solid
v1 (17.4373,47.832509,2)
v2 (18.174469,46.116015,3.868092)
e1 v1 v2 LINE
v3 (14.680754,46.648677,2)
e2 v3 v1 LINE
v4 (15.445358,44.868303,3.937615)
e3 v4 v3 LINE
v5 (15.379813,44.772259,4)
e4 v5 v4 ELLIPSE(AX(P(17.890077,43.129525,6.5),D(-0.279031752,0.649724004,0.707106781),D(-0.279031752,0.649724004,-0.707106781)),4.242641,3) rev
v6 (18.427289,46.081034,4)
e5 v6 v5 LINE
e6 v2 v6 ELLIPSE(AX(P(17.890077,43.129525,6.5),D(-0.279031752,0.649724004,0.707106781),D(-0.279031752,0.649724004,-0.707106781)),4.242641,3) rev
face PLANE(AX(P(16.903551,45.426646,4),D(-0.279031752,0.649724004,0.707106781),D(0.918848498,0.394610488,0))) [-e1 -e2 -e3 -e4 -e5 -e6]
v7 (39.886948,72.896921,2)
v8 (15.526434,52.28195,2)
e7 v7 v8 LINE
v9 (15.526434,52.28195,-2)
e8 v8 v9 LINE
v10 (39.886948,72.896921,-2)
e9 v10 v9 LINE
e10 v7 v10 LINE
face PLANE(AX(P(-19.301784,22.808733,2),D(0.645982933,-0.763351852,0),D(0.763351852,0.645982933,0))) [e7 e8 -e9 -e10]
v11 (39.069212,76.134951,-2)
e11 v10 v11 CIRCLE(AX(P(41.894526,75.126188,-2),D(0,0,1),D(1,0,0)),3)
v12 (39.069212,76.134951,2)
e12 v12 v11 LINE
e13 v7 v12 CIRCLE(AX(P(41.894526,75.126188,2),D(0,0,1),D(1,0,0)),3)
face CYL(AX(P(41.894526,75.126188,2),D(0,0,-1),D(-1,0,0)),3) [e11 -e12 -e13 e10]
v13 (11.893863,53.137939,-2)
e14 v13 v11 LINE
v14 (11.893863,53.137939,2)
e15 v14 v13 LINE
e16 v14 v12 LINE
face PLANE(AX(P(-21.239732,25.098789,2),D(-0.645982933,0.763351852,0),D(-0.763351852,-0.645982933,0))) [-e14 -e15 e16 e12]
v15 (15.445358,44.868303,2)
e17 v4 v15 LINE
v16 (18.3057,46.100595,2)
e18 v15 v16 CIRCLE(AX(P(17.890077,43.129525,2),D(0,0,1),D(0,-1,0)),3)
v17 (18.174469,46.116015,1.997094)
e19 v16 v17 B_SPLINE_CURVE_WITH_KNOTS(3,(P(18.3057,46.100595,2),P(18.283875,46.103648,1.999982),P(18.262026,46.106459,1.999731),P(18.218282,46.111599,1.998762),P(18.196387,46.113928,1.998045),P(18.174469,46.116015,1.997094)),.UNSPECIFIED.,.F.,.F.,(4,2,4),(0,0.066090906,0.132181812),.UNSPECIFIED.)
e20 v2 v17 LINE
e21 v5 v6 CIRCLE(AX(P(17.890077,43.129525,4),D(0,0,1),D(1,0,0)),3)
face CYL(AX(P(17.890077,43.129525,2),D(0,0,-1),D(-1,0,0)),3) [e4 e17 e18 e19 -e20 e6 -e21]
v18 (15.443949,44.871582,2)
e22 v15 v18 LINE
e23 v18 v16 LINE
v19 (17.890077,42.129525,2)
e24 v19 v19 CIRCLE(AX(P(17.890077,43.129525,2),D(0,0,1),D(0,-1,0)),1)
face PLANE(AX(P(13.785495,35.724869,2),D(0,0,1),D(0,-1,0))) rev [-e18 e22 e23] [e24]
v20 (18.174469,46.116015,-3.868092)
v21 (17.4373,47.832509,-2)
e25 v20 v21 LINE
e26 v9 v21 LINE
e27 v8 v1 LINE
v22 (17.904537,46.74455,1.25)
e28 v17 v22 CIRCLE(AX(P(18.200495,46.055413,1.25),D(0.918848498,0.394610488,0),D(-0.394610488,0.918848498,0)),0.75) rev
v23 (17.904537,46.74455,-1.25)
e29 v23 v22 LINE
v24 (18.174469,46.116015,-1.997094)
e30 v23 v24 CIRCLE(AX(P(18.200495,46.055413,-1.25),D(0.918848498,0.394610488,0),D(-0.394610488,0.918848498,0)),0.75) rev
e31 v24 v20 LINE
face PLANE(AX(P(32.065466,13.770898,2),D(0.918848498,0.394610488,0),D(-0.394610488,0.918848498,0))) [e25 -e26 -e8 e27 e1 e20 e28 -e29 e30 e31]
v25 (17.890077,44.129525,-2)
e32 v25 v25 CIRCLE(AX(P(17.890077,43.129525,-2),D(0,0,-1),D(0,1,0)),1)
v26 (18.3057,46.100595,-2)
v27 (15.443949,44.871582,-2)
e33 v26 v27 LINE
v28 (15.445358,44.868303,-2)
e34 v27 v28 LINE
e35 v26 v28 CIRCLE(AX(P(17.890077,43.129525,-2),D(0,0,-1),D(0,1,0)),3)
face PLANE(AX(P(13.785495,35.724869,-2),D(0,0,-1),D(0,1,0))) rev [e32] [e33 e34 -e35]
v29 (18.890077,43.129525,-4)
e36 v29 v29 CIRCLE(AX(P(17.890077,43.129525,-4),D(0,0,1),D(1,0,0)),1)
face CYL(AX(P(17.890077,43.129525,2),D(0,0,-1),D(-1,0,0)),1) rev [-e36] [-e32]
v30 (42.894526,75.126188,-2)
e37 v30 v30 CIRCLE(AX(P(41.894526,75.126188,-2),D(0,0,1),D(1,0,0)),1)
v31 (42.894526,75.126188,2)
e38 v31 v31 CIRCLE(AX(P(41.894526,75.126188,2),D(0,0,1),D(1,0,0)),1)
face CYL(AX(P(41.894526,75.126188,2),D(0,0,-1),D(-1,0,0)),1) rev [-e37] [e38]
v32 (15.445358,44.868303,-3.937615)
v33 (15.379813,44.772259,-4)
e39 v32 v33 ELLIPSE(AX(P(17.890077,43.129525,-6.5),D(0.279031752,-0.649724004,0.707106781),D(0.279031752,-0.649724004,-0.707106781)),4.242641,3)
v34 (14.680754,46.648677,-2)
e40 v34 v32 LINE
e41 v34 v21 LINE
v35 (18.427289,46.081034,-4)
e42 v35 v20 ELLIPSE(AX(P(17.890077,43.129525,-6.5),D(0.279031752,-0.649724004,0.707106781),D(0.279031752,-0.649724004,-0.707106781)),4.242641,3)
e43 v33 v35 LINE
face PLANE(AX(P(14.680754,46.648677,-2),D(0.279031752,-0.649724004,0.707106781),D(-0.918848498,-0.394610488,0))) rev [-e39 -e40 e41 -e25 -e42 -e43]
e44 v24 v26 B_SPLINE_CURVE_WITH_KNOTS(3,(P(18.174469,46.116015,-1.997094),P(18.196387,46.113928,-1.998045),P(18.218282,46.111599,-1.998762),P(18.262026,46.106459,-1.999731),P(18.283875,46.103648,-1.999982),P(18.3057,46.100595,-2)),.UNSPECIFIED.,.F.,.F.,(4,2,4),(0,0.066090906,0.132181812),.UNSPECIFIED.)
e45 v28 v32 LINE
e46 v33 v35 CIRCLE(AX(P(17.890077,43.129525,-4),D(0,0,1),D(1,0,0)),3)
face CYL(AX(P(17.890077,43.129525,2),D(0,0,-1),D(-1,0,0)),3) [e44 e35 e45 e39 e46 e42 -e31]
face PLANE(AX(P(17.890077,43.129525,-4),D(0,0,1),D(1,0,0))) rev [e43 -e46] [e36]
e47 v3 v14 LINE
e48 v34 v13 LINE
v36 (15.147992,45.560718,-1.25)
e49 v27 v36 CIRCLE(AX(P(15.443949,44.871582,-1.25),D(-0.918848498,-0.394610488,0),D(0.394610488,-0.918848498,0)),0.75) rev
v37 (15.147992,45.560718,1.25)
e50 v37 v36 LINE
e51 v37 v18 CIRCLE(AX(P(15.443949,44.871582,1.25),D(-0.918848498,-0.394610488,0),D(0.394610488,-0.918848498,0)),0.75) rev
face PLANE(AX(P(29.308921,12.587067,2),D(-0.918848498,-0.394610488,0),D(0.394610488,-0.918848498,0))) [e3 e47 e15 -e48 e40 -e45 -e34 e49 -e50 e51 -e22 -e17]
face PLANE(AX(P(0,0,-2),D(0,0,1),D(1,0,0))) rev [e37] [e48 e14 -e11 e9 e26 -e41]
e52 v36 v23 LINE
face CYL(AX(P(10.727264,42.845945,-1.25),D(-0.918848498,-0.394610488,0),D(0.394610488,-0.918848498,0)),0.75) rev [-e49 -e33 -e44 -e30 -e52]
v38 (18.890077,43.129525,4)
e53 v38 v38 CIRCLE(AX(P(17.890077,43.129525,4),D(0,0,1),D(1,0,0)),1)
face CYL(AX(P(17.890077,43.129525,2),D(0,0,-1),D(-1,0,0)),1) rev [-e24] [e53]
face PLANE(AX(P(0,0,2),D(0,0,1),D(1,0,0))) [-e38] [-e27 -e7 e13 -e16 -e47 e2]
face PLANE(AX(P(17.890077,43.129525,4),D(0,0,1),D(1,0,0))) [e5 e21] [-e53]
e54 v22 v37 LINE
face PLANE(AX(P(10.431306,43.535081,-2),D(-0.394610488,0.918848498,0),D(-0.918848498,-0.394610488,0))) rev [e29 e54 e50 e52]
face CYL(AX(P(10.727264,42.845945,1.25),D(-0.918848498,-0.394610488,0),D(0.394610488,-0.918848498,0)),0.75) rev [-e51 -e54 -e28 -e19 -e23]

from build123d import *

# Parameters (mm, degrees)
SKETCH7_R               = 2.9999999999999982
SKETCH7_R_2             = 1.0000000000000018
SKETCH7_R_3             = 3.0000000000000018
SKETCH7_R_4             = 0.9999999999999983
BOSS_EXTRUDE1_DEPTH     = 2
SKETCH9_R               = 0.9999999999999983
BOSS_EXTRUDE2_DEPTH     = 4
CUT_EXTRUDE3_DEPTH      = 68.5610601855979
CUT_EXTRUDE3_DEPTH_BACK = 68.5610601855979
CHAMFER1_SIZE           = 2
FILLET10_R              = 0.75


with BuildPart() as part:
    # Sketch7 → Boss-Extrude1 (new, symmetric)
    # profile 1 of 3: a face of its own
    with BuildSketch(Plane.XY):
        with BuildLine():
            Line((11.893863235859584, 53.137939029439345), (15.445357626885196, 44.86830254465274))
            ThreePointArc((15.445357626885198, 44.86830254465274), (16.642699652600193, 45.857903547949306), (18.174468795559314, 46.11601469638566))
            Line((18.174468795559314, 46.11601469638567), (15.526434240422798, 52.28194958437761))
            Line((15.526434240422798, 52.28194958437761), (39.886948210676515, 72.89692053805315))
            ThreePointArc((39.88694821067651, 72.89692053805315), (38.98584570958542, 74.39162614577609), (39.06921198001558, 76.13495073866909))
            Line((39.06921198001558, 76.13495073866909), (11.893863235859584, 53.137939029439345))
        make_face()
    # profile 2 of 3: a face of its own
    with BuildSketch(Plane.XY):
        with Locations((17.890076901850104, 43.12952490889392)):
            Circle(SKETCH7_R)
        with Locations((17.890076901850104, 43.12952490889392)):
            Circle(SKETCH7_R_2, mode=Mode.SUBTRACT)
    # profile 3 of 3: a face of its own
    with BuildSketch(Plane.XY):
        with Locations((41.8945256681437, 75.12618785093188)):
            Circle(SKETCH7_R_3)
        with Locations((41.8945256681437, 75.12618785093188)):
            Circle(SKETCH7_R_4, mode=Mode.SUBTRACT)
    extrude(amount=BOSS_EXTRUDE1_DEPTH, both=True)

    # Sketch9 → Boss-Extrude2 (add, symmetric)
    with BuildSketch(Plane.XY):
        with BuildLine():
            Line((17.43729995500307, 47.832508562943936), (18.174468795559275, 46.11601469638567))
            ThreePointArc((18.174468795559275, 46.11601469638567), (19.137454151100034, 40.40114626983855), (15.4453576268852, 44.86830254465274))
            Line((15.4453576268852, 44.86830254465274), (14.680754460074215, 46.64867709926875))
            Line((14.680754460074215, 46.64867709926875), (17.43729995500307, 47.832508562943936))
        make_face()
        with Locations((17.890076901850104, 43.12952490889392)):
            Circle(SKETCH9_R, mode=Mode.SUBTRACT)
    extrude(amount=BOSS_EXTRUDE2_DEPTH, both=True)

    # Sketch10 → Cut-Extrude3 (cut, two sides: drawn at the far end of the back side and taken through both)
    with BuildSketch(Plane(origin=(32.06546623724915, 13.770898357710635, 0), x_dir=(0, 0, -1), z_dir=(0.9188484983096216, 0.39461048789173536, 0)).offset(-CUT_EXTRUDE3_DEPTH_BACK)):
        Polygon((1.9999999999999996, 27.385841036947262), (-1.9999999999999991, 27.385841036947262), (-1.9999999999999996, 35.88584103694727), (2.0000000000000004, 35.88584103694727), align=None)
    extrude(amount=CUT_EXTRUDE3_DEPTH + CUT_EXTRUDE3_DEPTH_BACK, mode=Mode.SUBTRACT)

    # Chamfer1
    chamfer1_edges = [part.edges().sort_by_distance(p)[0] for p in [
        (16.05902720753864, 47.24059283110634, -4),
        (16.05902720753864, 47.24059283110634, 4),
    ]]
    chamfer(chamfer1_edges, length=CHAMFER1_SIZE - 0.0001)  # a hair under: the kernel refuses the full size

    # Fillet10
    fillet10_edges = [part.edges().sort_by_distance(p)[0] for p in [
        (16.526264249789705, 46.15263377324982, -2.0000000000000004),
        (16.526264249789676, 46.15263377324982, 1.9999999999999996),
    ]]
    fillet(fillet10_edges, radius=FILLET10_R)


solid = part.part
